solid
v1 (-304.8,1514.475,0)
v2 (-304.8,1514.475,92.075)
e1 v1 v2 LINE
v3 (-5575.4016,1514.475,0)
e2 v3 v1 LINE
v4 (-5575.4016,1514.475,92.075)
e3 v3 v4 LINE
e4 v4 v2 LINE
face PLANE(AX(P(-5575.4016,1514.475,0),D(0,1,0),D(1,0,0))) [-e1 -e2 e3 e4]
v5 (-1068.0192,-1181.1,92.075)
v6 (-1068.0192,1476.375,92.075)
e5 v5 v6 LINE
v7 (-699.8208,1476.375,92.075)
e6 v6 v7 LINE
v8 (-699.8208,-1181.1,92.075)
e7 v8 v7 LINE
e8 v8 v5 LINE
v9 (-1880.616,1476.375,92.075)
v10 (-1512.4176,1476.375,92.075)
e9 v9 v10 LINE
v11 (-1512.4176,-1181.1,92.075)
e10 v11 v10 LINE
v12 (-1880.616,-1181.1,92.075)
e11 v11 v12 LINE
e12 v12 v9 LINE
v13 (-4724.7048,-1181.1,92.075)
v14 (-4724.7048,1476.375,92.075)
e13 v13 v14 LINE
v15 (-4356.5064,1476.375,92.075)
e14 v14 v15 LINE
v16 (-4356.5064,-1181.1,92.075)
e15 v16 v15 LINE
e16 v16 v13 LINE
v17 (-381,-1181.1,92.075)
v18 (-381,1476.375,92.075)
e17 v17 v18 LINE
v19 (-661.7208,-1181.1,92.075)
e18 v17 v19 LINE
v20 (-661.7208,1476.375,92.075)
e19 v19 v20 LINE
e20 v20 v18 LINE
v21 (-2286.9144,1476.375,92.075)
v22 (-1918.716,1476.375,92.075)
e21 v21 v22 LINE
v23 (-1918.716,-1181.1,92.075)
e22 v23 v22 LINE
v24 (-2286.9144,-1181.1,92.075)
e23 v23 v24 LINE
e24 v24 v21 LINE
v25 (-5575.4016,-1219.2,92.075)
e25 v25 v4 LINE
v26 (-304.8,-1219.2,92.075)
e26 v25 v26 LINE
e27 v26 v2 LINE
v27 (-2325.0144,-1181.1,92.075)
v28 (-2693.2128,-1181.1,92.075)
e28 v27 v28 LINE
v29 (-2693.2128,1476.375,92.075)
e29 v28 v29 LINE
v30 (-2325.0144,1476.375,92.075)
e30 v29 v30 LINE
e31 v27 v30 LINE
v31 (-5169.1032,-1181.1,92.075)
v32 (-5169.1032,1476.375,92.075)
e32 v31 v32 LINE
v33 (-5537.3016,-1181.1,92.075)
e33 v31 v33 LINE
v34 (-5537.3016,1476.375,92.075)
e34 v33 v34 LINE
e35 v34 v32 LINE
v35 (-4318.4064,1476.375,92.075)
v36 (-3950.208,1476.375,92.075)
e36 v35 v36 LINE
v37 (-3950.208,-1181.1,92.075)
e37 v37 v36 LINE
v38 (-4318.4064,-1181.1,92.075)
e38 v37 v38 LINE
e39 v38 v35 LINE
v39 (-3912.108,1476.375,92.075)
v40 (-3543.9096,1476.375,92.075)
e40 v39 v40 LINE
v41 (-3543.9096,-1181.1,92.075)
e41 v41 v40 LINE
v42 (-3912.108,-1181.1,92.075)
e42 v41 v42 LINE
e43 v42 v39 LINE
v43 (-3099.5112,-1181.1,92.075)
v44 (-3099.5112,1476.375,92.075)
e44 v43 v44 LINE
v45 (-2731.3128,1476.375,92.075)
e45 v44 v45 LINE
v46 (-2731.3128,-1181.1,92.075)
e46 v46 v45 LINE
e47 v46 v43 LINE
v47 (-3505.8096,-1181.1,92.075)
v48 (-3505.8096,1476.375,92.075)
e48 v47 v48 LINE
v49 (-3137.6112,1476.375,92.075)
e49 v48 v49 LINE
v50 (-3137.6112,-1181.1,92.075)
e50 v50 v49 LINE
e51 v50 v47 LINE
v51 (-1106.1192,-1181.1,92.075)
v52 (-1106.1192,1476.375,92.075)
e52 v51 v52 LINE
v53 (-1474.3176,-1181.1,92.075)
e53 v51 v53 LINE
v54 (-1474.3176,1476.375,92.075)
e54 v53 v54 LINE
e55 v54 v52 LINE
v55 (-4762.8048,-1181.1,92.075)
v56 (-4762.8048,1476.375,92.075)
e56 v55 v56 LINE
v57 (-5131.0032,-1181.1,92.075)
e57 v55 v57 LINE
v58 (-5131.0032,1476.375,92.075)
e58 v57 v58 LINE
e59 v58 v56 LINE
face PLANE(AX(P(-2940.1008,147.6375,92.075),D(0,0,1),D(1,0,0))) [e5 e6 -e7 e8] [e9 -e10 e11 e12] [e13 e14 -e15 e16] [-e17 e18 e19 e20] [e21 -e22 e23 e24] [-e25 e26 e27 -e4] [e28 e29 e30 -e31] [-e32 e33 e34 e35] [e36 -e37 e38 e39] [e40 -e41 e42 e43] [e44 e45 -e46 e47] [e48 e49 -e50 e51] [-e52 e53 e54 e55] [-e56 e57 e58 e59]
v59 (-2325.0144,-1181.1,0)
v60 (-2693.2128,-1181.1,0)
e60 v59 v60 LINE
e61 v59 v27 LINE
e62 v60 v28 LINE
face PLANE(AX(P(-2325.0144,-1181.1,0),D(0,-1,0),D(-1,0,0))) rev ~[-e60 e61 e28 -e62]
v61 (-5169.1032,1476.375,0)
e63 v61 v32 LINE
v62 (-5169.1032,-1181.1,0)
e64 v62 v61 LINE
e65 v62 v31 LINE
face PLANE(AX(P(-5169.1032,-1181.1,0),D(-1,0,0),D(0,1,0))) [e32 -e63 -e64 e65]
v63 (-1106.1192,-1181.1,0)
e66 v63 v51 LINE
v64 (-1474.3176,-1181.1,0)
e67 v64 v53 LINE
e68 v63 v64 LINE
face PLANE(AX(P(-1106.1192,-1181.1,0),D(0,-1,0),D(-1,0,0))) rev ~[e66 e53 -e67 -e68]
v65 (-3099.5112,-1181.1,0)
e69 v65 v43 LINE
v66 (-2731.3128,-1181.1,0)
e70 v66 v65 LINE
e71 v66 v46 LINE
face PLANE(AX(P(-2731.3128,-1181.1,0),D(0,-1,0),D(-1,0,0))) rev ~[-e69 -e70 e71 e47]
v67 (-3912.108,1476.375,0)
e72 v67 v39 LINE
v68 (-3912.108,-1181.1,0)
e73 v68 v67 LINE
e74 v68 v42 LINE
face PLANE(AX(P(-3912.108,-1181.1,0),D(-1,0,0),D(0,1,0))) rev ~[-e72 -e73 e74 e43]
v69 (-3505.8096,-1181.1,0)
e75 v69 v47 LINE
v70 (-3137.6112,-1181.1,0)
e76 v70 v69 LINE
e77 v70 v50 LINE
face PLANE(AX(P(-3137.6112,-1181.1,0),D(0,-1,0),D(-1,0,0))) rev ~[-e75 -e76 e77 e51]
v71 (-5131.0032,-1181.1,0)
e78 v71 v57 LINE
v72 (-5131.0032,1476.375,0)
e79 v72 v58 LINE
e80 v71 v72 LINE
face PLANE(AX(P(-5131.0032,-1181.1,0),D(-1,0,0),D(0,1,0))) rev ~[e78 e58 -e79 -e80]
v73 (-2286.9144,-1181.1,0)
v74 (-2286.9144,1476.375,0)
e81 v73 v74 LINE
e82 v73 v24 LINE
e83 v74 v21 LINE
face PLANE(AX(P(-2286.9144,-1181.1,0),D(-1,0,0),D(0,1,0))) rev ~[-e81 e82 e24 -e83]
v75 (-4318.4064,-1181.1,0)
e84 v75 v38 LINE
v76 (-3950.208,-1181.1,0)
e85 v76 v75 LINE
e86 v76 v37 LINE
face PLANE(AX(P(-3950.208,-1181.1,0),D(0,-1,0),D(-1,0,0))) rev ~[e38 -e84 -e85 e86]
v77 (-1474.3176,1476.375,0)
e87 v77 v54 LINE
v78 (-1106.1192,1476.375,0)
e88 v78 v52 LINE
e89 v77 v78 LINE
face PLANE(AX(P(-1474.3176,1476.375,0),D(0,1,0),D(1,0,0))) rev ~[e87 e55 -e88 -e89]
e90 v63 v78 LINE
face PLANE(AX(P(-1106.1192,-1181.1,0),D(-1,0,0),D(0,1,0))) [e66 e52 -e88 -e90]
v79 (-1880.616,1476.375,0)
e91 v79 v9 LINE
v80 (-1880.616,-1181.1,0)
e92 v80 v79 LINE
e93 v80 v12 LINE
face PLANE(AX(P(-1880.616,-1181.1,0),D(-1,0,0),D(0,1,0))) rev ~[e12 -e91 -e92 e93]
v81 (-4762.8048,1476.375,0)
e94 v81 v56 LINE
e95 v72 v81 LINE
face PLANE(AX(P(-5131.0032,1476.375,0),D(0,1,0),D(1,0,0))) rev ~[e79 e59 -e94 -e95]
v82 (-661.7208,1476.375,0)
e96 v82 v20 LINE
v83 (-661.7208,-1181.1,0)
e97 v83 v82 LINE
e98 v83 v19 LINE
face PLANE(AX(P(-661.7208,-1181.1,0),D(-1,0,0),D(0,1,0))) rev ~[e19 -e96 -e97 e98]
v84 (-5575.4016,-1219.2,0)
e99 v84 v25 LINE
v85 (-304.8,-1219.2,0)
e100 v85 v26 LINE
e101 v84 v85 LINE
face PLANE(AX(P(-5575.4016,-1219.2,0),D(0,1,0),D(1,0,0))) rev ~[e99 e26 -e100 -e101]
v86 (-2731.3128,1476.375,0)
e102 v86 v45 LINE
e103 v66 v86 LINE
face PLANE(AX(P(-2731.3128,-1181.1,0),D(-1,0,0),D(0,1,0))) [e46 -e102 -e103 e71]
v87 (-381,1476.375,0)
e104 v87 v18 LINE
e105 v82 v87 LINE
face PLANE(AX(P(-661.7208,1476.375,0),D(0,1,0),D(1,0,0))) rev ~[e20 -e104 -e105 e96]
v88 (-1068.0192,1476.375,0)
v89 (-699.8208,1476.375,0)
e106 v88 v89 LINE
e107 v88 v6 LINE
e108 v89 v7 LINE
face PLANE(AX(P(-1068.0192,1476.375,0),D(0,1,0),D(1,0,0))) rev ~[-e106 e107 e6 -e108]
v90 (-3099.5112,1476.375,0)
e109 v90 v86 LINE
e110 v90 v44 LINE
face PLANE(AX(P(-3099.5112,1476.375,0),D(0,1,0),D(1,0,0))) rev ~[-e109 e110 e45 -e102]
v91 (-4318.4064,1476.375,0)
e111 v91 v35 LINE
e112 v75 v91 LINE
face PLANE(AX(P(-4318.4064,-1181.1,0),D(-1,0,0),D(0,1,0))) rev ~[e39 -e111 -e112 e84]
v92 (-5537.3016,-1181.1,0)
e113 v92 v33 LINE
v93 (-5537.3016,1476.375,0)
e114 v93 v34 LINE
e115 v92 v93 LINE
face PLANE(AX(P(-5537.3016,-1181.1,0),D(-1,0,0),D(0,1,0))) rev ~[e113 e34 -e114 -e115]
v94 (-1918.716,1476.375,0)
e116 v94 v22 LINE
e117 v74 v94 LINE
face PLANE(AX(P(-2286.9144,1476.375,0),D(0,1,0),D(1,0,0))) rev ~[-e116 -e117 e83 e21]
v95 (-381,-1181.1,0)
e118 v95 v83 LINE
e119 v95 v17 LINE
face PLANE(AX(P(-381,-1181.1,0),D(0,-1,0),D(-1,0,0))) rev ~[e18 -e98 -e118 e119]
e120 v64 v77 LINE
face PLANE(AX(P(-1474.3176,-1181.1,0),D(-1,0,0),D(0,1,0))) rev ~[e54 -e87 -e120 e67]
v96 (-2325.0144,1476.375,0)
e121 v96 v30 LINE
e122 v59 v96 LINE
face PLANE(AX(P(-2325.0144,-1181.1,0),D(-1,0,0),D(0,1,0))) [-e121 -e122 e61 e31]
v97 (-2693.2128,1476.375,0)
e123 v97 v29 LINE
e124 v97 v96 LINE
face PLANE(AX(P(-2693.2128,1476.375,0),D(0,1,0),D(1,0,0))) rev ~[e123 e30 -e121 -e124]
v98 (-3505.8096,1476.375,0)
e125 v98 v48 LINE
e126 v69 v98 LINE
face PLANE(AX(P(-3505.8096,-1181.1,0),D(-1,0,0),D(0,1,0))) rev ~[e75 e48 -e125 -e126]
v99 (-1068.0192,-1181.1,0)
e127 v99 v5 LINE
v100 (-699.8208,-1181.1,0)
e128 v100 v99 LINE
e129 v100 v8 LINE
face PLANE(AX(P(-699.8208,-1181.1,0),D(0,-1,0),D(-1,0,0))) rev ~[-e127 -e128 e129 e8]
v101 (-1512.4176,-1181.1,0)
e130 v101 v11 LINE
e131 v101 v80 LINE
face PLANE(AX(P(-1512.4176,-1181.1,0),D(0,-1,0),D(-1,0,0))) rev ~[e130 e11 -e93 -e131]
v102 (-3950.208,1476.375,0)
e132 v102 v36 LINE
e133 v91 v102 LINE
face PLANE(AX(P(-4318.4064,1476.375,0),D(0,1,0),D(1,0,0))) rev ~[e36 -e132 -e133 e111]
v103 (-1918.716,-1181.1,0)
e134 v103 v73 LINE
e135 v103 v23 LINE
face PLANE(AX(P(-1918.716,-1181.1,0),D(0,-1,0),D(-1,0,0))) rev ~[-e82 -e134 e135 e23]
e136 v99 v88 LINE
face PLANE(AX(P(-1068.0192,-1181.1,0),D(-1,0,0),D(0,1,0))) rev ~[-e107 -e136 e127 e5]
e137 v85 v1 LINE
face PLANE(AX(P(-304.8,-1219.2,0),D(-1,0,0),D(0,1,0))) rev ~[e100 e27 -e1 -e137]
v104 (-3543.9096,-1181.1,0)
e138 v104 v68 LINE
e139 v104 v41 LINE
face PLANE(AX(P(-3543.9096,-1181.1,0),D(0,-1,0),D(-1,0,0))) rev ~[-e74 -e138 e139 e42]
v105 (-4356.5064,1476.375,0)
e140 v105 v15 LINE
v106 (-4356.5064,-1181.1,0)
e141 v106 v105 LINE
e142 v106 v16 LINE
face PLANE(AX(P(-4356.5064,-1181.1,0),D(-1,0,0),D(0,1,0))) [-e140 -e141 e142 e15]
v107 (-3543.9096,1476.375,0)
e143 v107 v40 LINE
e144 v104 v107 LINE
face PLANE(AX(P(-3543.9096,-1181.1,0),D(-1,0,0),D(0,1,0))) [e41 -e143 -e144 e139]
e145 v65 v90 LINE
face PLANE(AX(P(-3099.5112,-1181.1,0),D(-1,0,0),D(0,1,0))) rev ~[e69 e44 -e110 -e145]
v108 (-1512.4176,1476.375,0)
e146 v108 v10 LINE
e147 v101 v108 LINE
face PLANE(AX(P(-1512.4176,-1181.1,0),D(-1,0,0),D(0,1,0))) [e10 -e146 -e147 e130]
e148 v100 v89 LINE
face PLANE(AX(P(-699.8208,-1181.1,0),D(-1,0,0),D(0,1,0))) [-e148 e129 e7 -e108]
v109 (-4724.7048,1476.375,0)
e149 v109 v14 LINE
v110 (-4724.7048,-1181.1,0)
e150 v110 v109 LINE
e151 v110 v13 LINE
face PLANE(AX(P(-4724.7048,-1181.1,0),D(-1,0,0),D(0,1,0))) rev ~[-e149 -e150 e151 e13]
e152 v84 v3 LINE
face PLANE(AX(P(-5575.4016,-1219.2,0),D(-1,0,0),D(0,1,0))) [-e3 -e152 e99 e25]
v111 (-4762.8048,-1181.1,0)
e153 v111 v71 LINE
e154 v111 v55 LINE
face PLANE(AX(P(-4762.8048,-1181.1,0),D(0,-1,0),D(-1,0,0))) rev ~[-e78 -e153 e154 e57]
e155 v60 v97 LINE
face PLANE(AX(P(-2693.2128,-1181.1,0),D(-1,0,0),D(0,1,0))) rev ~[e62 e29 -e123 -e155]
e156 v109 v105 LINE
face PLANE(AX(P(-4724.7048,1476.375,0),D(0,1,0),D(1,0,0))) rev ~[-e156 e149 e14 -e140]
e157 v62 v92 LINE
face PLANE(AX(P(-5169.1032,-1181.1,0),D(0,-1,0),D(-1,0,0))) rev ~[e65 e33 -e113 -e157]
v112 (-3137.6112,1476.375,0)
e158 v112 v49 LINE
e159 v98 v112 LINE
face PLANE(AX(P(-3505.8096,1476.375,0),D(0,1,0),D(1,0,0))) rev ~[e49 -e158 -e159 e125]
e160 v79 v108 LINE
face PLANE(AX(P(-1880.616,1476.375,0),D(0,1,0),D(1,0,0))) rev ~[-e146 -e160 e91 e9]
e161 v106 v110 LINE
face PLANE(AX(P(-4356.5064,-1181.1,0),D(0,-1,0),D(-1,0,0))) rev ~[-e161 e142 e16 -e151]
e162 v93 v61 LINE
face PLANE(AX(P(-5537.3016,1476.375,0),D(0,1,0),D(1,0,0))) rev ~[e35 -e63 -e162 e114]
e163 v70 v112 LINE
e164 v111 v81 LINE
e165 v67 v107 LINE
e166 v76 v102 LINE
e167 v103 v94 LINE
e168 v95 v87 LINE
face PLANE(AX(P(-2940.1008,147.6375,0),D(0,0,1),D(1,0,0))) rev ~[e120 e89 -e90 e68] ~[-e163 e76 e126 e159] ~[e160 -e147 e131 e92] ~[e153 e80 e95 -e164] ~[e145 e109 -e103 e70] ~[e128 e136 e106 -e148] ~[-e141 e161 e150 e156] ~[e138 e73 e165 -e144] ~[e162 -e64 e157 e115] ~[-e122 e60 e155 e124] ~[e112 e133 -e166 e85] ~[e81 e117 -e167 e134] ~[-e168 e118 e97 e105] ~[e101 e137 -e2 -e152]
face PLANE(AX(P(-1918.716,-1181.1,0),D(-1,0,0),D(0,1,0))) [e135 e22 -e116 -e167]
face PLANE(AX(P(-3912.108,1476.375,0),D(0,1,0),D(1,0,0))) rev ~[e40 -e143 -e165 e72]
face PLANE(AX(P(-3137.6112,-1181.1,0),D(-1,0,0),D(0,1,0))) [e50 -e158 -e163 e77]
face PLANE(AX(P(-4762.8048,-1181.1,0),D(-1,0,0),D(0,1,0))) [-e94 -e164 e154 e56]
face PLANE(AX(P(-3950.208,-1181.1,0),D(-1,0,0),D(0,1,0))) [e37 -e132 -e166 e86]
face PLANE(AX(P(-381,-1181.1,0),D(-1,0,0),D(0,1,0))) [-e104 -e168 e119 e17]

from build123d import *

# Parameters (mm, degrees)
F0_W     = 5270.6016
F0_H     = 2733.675
F0_W_2   = 38.1
F0_H_2   = 2657.475
F1_DEPTH = 92.075


# Not quite as in the source:
# - a feature names something its author has since deleted; it is built from what else it names


with BuildPart() as f1:
    # F0 (on Top) → F1 (new body)
    with BuildSketch(Plane.XY):
        with Locations((-2940.1008, 147.6375)):
            Rectangle(F0_W, F0_H)
        Polygon((-5537.3016, -1181.1), (-5537.3016, 1476.375), (-5169.1032, 1476.375), (-5131.0032, 1476.375), (-4762.8048, 1476.375), (-4724.7048, 1476.375), (-4356.5064, 1476.375), (-4318.4064, 1476.375), (-3950.208, 1476.375), (-3912.108, 1476.375), (-3543.9096, 1476.375), (-3505.8096, 1476.375), (-3137.6112, 1476.375), (-3099.5112, 1476.375), (-2731.3128, 1476.375), (-2693.2128, 1476.375), (-2325.0144, 1476.375), (-2286.9144, 1476.375), (-1918.716, 1476.375), (-1880.616, 1476.375), (-1512.4176, 1476.375), (-1474.3176, 1476.375), (-1106.1192, 1476.375), (-1068.0192, 1476.375), (-699.8208, 1476.375), (-661.7208, 1476.375), (-381, 1476.375), (-342.9, 1476.375), (-342.9, -1181.1), (-381, -1181.1), (-661.7208, -1181.1), (-699.8208, -1181.1), (-1068.0192, -1181.1), (-1106.1192, -1181.1), (-1474.3176, -1181.1), (-1512.4176, -1181.1), (-1880.616, -1181.1), (-1918.716, -1181.1), (-2286.9144, -1181.1), (-2325.0144, -1181.1), (-2693.2128, -1181.1), (-2731.3128, -1181.1), (-3099.5112, -1181.1), (-3137.6112, -1181.1), (-3505.8096, -1181.1), (-3543.9096, -1181.1), (-3912.108, -1181.1), (-3950.208, -1181.1), (-4318.4064, -1181.1), (-4356.5064, -1181.1), (-4724.7048, -1181.1), (-4762.8048, -1181.1), (-5131.0032, -1181.1), (-5169.1032, -1181.1), align=None, mode=Mode.SUBTRACT)
        with Locations((-5150.0532, 147.6375)):
            Rectangle(F0_W_2, F0_H_2)
        with Locations((-4743.7548, 147.6375)):
            Rectangle(F0_W_2, F0_H_2)
        with Locations((-4337.4564, 147.6375)):
            Rectangle(F0_W_2, F0_H_2)
        with Locations((-3931.158, 147.6375)):
            Rectangle(F0_W_2, F0_H_2)
        with Locations((-3524.8596, 147.6375)):
            Rectangle(F0_W_2, F0_H_2)
        with Locations((-3118.5612, 147.6375)):
            Rectangle(F0_W_2, F0_H_2)
        with Locations((-2712.2628, 147.6375)):
            Rectangle(F0_W_2, F0_H_2)
        with Locations((-2305.9644, 147.6375)):
            Rectangle(F0_W_2, F0_H_2)
        with Locations((-1899.666, 147.6375)):
            Rectangle(F0_W_2, F0_H_2)
        with Locations((-1493.3676, 147.6375)):
            Rectangle(F0_W_2, F0_H_2)
        with Locations((-1087.0692, 147.6375)):
            Rectangle(F0_W_2, F0_H_2)
        with Locations((-361.95, 147.6375)):
            Rectangle(F0_W_2, F0_H_2)
        with Locations((-680.7708, 147.6375)):
            Rectangle(F0_W_2, F0_H_2)
    extrude(amount=F1_DEPTH)


solid = f1.part
